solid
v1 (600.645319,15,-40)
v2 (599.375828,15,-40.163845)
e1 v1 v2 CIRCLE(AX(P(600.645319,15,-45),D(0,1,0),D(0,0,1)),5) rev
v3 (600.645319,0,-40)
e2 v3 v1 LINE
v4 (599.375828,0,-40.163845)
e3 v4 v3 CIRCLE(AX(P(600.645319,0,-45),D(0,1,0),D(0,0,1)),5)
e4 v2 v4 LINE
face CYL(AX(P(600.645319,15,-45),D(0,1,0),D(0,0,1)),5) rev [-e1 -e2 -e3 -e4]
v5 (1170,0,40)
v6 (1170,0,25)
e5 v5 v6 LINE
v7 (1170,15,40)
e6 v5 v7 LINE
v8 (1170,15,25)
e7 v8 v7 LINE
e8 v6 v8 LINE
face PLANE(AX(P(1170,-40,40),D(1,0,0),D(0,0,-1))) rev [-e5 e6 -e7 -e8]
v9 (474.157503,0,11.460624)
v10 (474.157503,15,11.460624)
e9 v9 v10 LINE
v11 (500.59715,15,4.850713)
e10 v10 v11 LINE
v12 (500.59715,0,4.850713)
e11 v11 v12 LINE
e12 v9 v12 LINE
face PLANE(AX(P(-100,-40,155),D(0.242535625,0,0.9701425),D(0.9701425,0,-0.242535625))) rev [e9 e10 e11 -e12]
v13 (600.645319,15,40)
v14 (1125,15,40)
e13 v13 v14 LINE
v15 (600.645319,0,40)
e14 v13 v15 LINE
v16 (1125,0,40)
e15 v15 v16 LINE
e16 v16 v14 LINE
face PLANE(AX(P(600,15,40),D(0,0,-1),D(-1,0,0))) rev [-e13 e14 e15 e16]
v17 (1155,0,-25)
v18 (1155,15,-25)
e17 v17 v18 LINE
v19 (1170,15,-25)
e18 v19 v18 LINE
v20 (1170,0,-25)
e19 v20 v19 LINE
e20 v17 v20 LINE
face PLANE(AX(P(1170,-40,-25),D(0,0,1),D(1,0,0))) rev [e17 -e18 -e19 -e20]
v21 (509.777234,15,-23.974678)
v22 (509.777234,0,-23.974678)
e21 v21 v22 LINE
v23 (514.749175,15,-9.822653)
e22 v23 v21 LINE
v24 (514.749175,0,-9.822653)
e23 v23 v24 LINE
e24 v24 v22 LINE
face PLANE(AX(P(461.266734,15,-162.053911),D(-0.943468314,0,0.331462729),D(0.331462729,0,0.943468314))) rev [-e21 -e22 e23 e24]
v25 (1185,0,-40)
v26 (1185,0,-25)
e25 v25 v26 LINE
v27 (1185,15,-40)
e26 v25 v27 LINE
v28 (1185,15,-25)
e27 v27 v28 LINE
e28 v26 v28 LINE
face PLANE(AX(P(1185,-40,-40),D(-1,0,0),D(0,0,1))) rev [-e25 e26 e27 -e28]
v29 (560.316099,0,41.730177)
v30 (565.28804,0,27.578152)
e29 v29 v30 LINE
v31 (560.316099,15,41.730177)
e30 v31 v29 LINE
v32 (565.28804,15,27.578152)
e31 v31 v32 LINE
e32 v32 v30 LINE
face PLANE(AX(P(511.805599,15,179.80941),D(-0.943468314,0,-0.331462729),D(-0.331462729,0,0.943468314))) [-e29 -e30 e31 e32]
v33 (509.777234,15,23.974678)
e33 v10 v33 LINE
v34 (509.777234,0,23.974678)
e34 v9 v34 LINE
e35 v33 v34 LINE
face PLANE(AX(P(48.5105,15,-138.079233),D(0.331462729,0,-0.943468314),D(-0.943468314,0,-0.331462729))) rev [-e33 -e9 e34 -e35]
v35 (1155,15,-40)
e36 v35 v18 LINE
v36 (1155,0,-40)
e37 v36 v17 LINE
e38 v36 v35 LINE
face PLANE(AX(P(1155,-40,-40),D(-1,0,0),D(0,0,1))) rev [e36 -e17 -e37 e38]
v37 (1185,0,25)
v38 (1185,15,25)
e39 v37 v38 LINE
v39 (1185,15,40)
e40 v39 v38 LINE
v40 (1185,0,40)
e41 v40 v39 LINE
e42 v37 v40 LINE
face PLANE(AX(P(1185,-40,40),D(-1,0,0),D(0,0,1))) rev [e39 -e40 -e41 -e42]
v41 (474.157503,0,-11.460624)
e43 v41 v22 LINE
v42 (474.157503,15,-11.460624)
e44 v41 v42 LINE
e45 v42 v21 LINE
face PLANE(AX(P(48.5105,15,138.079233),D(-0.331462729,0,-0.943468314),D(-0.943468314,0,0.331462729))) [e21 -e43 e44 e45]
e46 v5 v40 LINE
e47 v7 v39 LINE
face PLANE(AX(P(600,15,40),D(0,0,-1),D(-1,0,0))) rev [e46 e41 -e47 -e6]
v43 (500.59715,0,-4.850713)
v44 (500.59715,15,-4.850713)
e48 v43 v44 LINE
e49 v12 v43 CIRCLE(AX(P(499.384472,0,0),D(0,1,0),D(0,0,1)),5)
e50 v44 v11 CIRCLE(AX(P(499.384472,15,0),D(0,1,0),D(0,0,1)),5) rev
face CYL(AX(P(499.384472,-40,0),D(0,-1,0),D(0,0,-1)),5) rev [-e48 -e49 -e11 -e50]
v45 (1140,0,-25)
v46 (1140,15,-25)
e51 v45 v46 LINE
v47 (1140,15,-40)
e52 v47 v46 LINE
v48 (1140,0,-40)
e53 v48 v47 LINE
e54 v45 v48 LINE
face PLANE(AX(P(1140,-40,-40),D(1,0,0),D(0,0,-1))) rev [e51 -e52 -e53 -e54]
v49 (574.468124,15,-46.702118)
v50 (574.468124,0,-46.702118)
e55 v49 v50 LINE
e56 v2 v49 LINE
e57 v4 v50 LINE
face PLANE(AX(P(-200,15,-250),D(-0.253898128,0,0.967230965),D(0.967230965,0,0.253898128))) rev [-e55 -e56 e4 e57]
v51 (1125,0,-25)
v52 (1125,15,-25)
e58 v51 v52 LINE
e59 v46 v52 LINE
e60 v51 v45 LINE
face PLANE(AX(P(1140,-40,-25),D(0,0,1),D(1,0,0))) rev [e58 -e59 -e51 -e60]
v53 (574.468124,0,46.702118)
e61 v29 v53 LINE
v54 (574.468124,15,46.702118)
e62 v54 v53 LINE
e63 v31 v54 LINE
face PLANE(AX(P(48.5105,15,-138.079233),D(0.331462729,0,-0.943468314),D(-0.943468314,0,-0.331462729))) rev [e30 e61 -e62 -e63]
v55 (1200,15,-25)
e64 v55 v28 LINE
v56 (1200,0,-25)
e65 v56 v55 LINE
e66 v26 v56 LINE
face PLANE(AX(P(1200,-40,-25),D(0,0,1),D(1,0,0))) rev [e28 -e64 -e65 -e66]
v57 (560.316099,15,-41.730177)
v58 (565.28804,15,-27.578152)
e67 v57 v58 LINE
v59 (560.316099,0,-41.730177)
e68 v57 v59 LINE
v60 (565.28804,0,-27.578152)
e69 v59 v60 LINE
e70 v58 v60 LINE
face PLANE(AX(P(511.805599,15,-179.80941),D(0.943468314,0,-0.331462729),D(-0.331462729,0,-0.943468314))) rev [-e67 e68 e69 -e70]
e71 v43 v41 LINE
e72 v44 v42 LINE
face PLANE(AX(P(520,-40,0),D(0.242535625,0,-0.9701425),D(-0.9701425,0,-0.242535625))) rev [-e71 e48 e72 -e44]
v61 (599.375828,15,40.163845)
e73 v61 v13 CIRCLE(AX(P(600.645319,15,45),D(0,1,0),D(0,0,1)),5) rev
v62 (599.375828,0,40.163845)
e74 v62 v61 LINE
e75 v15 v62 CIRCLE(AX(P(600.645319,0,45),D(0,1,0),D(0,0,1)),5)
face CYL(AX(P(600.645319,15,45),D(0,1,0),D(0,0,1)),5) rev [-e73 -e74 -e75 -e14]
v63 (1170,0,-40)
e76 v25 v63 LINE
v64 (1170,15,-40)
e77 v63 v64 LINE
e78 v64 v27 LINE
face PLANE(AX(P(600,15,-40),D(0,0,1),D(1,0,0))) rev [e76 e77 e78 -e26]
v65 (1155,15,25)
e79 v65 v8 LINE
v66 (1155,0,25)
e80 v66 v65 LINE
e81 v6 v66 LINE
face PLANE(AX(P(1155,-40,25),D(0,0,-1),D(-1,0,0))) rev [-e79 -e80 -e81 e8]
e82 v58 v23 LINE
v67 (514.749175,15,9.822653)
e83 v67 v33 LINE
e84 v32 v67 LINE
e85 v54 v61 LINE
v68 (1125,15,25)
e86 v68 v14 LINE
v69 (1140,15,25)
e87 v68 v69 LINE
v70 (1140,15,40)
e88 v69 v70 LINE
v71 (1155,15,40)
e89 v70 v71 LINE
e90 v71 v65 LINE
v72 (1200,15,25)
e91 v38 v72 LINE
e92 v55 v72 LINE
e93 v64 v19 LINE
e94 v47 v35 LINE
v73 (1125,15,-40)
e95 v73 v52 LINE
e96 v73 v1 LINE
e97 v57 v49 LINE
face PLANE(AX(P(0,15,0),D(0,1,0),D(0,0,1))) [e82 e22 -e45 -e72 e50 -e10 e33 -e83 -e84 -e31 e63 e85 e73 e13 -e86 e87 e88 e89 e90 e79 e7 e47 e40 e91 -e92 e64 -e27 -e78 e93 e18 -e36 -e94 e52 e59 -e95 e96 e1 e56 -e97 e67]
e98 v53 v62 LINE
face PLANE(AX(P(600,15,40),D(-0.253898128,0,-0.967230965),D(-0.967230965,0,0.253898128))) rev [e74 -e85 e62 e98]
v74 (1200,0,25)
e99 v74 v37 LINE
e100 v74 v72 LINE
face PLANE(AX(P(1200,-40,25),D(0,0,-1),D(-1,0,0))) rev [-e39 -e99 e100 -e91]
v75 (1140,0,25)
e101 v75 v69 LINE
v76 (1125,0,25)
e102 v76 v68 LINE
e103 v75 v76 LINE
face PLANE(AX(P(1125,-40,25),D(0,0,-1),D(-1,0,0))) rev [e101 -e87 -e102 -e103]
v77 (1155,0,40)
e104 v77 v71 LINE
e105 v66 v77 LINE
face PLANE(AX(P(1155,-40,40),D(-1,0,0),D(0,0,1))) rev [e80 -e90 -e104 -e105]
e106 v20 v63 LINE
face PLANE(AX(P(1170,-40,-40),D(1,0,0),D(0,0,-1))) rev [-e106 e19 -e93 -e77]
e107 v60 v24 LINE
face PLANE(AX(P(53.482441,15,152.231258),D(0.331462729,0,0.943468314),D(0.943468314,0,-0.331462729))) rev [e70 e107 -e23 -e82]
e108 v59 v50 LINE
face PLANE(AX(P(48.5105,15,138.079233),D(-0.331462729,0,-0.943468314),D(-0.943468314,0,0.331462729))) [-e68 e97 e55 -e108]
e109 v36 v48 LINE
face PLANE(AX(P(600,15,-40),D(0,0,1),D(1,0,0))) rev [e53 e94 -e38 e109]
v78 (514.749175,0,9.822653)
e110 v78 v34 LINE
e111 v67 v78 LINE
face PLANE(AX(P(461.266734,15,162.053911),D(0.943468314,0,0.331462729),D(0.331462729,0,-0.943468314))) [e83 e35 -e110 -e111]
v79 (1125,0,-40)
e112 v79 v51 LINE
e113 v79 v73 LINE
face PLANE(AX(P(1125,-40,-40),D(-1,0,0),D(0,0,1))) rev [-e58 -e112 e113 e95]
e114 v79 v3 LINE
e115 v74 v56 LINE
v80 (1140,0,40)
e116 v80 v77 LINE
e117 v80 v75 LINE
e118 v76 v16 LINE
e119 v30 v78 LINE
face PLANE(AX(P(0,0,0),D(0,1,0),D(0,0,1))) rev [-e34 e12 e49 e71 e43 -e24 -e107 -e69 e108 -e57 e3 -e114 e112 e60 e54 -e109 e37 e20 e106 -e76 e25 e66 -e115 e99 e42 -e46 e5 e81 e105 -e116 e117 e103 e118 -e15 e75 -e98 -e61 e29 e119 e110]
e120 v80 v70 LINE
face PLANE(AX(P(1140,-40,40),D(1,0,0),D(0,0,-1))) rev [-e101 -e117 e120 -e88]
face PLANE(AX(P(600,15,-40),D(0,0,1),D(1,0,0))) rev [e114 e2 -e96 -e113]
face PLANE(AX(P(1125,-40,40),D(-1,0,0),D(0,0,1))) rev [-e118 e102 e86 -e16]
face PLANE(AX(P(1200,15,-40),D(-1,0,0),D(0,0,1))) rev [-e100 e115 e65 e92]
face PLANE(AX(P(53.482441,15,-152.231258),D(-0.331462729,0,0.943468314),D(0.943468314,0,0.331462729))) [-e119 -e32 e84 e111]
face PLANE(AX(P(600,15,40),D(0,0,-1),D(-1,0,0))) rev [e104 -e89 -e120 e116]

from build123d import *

# Parameters (mm, degrees)
BOSS_EXTRUDE1_DEPTH             = 15
BOSS_EXTRUDE2_REACH             = 1239.023
BOSS_EXTRUDE2_DIRECTION_2_REACH = 1239.023
CUT_EXTRUDE2_DEPTH              = 1238.578280352
CUT_EXTRUDE2_DEPTH_BACK         = 1238.578280352
SKETCH5_W                       = 40
SKETCH5_H                       = 40
CUT_EXTRUDE3_DEPTH              = 1238.578280352
BOSS_EXTRUDE4_DEPTH             = 75
CUT_EXTRUDE4_DEPTH              = 1241.107934819
CUT_EXTRUDE4_DEPTH_BACK         = 1241.107934819
SKETCH8_W                       = 15
SKETCH8_H                       = 73.7
FILLET1_R                       = 5
CUT_EXTRUDE5_DEPTH              = 1241.107934819
CUT_EXTRUDE5_DEPTH_BACK         = 1241.107934819
SKETCH9_W                       = 25
SKETCH9_H                       = 15
SKETCH9_W_2                     = 15
CUT_EXTRUDE6_DEPTH              = 1241.107934819
CUT_EXTRUDE6_DEPTH_BACK         = 1241.107934819
SKETCH10_W                      = 1728.920732784
SKETCH10_H                      = 178.853868908
SKETCH10_W_2                    = 1650
SKETCH10_H_2                    = 15
CUT_EXTRUDE8_DEPTH              = 1238.022635201


with BuildPart() as part:
    # Sketch1 → Boss-Extrude1 (new body)
    with BuildSketch(Plane(origin=(0, 0, 0), x_dir=(1, 0, 0), z_dir=(0, 1, 0))):
        Polygon((-450, 300), (-400, 300), (-200, 250), (600, 40), (1200, 40), (1200, -40), (600, -40), (-200, -250), (-400, -300), (-450, -300), align=None)
    extrude(amount=BOSS_EXTRUDE1_DEPTH)

    # Boss-Extrude2: up to this face of the body (flat: up to its plane)
    boss_extrude2_end = Plane(part.part.faces().sort_by_distance((-425, 7.5, 300))[0])
    # Sketch2 → Boss-Extrude2 (add, up to the picked face)
    with BuildSketch(Plane.XY, mode=Mode.PRIVATE) as boss_extrude2_sk1:
        with BuildLine():
            Line((-425, 0), (-450, 0))
            Line((-450, 0), (-450, -40))
            Line((-450, -40), (-440, -40))
            Line((-440, -40), (-440, -15))
            ThreePointArc((-440, -15), (-435.606601718, -4.393398282), (-425, 0))
        make_face()
    boss_extrude2_tool1 = split(extrude(boss_extrude2_sk1.sketch, amount=BOSS_EXTRUDE2_REACH, mode=Mode.PRIVATE), bisect_by=boss_extrude2_end, keep=Keep.BOTH, mode=Mode.PRIVATE)
    # Sketch2 → Boss-Extrude2 (add, up to the picked face)
    with BuildSketch(Plane.XY, mode=Mode.PRIVATE) as boss_extrude2_sk2:
        with BuildLine():
            Line((-400, 0), (-425, 0))
            ThreePointArc((-425, 0), (-414.393398282, -4.393398282), (-410, -15))
            Line((-410, -15), (-410, -40))
            Line((-410, -40), (-400, -40))
            Line((-400, -40), (-400, 0))
        make_face()
    boss_extrude2_tool2 = split(extrude(boss_extrude2_sk2.sketch, amount=BOSS_EXTRUDE2_REACH, mode=Mode.PRIVATE), bisect_by=boss_extrude2_end, keep=Keep.BOTH, mode=Mode.PRIVATE)
    add(boss_extrude2_tool1.solids().sort_by(Axis((-444.100555, -18.206662, 0), (0, 0, 1)))[0])
    add(boss_extrude2_tool2.solids().sort_by(Axis((-405.899445, -18.206662, 0), (0, 0, 1)))[0])

    # Boss-Extrude2 direction 2: up to this face of the body (flat: up to its plane)
    boss_extrude2_direction_2_end = Plane(part.part.faces().sort_by_distance((-425, 7.5, -300))[0])
    # Sketch2 → Boss-Extrude2 direction 2 (add, up to the picked face)
    with BuildSketch(Plane.XY, mode=Mode.PRIVATE) as boss_extrude2_direction_2_sk1:
        with BuildLine():
            Line((-425, 0), (-450, 0))
            Line((-450, 0), (-450, -40))
            Line((-450, -40), (-440, -40))
            Line((-440, -40), (-440, -15))
            ThreePointArc((-440, -15), (-435.606601718, -4.393398282), (-425, 0))
        make_face()
    boss_extrude2_direction_2_tool1 = split(extrude(boss_extrude2_direction_2_sk1.sketch, amount=-BOSS_EXTRUDE2_DIRECTION_2_REACH, mode=Mode.PRIVATE), bisect_by=boss_extrude2_direction_2_end, keep=Keep.BOTH, mode=Mode.PRIVATE)
    # Sketch2 → Boss-Extrude2 direction 2 (add, up to the picked face)
    with BuildSketch(Plane.XY, mode=Mode.PRIVATE) as boss_extrude2_direction_2_sk2:
        with BuildLine():
            Line((-400, 0), (-425, 0))
            ThreePointArc((-425, 0), (-414.393398282, -4.393398282), (-410, -15))
            Line((-410, -15), (-410, -40))
            Line((-410, -40), (-400, -40))
            Line((-400, -40), (-400, 0))
        make_face()
    boss_extrude2_direction_2_tool2 = split(extrude(boss_extrude2_direction_2_sk2.sketch, amount=-BOSS_EXTRUDE2_DIRECTION_2_REACH, mode=Mode.PRIVATE), bisect_by=boss_extrude2_direction_2_end, keep=Keep.BOTH, mode=Mode.PRIVATE)
    add(boss_extrude2_direction_2_tool1.solids().sort_by(Axis((-444.100555, -18.206662, 0), (0, 0, -1)))[0])
    add(boss_extrude2_direction_2_tool2.solids().sort_by(Axis((-405.899445, -18.206662, 0), (0, 0, -1)))[0])

    # Sketch4 → Cut-Extrude2 (cut, two sides: drawn at the far end of the back side and taken through both)
    with BuildSketch(Plane(origin=(0, 0, 0), x_dir=(1, 0, 0), z_dir=(0, 1, 0)).offset(-CUT_EXTRUDE2_DEPTH_BACK)):
        Polygon((-450, 230), (-400, 230), (-150, 167.5), (-150, -167.5), (-400, -230), (-450, -230), align=None)
        Polygon((-100, 155), (-100, -155), (520, 0), align=None)
    extrude(amount=CUT_EXTRUDE2_DEPTH + CUT_EXTRUDE2_DEPTH_BACK, mode=Mode.SUBTRACT)

    # Sketch5 → Cut-Extrude3 (cut, through all)
    with BuildSketch(Plane(origin=(0, 0, 0), x_dir=(0, 0, -1), z_dir=(1, 0, 0))):
        with Locations((-265, -20)):
            Rectangle(SKETCH5_W, SKETCH5_H)
        with Locations((265, -20)):
            Rectangle(SKETCH5_W, SKETCH5_H)
    extrude(amount=-CUT_EXTRUDE3_DEPTH, mode=Mode.SUBTRACT)

    # Sketch7 → Boss-Extrude4 (add)
    with BuildSketch(Plane(origin=(1200, 0, 0), x_dir=(0, 0, -1), z_dir=(1, 0, 0))):
        with BuildLine():
            Line((-87.5, 50), (-40, 15))
            Line((-40, 15), (40, 15))
            Line((40, 15), (87.5, 50))
            Line((87.5, 50), (87.5, 88.7))
            Line((87.5, 88.7), (58.5, 88.7))
            Line((58.5, 88.7), (58.5, 63.2))
            Line((58.5, 63.2), (48.5, 63.2))
            Line((48.5, 63.2), (48.5, 88.7))
            Line((48.5, 88.7), (20, 88.7))
            Line((20, 88.7), (20, 50))
            ThreePointArc((20, 50), (0, 30), (-20, 50))
            Line((-20, 50), (-20, 88.7))
            Line((-20, 88.7), (-63, 88.7))
            Line((-63, 88.7), (-63, 63.2))
            Line((-63, 63.2), (-73, 63.2))
            Line((-73, 63.2), (-73, 88.7))
            Line((-73, 88.7), (-87.5, 88.7))
            Line((-87.5, 88.7), (-87.5, 50))
        make_face()
    extrude(amount=-BOSS_EXTRUDE4_DEPTH)

    # Sketch8 → Cut-Extrude4 (cut, two sides: drawn at the far end of the back side and taken through both)
    with BuildSketch(Plane.XY.offset(-CUT_EXTRUDE4_DEPTH_BACK)):
        with Locations((1147.5, 51.85)):
            Rectangle(SKETCH8_W, SKETCH8_H)
        with Locations((1177.5, 51.85)):
            Rectangle(SKETCH8_W, SKETCH8_H)
    extrude(amount=CUT_EXTRUDE4_DEPTH + CUT_EXTRUDE4_DEPTH_BACK, mode=Mode.SUBTRACT)

    # Fillet1
    fillet1_edges = [part.edges().sort_by_distance(p)[0] for p in [
        (1192.5, 50, 87.5),
        (1162.5, 50, 87.5),
        (1132.5, 50, 87.5),
        (1192.5, 50, -87.5),
        (1162.5, 50, -87.5),
        (1132.5, 50, -87.5),
        (1192.5, 88.7, -87.5),
        (1162.5, 88.7, -87.5),
        (1132.5, 88.7, -87.5),
        (1132.5, 88.7, -58.5),
        (1162.5, 88.7, -58.5),
        (1192.5, 88.7, -58.5),
        (1192.5, 88.7, -48.5),
        (1162.5, 88.7, -48.5),
        (1132.5, 88.7, -48.5),
        (1192.5, 88.7, -20),
        (1162.5, 88.7, -20),
        (1132.5, 88.7, -20),
        (1192.5, 88.7, 63),
        (1162.5, 88.7, 63),
        (1132.5, 88.7, 63),
        (1132.5, 88.7, 87.5),
        (1162.5, 88.7, 87.5),
        (1192.5, 88.7, 87.5),
        (1192.5, 88.7, 73),
        (1162.5, 88.7, 73),
        (1132.5, 88.7, 73),
        (1192.5, 88.7, 20),
        (1162.5, 88.7, 20),
        (1132.5, 88.7, 20),
        (600, 7.5, 40),
        (600, 7.5, -40),
        (520, 7.5, 0),
        (-440, -40, -292.5),
        (-440, -40, -237.5),
        (-400, -40, -292.5),
        (-400, -40, -237.5),
        (-450, -40, -237.5),
        (-410, -40, -237.5),
        (-450, -40, -292.5),
        (-410, -40, -292.5),
        (-150, 7.5, 167.5),
        (-100, 7.5, 155),
        (-150, 7.5, -167.5),
        (-100, 7.5, -155),
        (-450, -40, 237.5),
        (-410, -40, 237.5),
        (-440, -40, 237.5),
        (-400, -40, 237.5),
        (-450, -40, 292.5),
        (-440, -40, 292.5),
        (-400, -40, 292.5),
        (-410, -40, 292.5),
    ]]
    fillet(fillet1_edges, radius=FILLET1_R - 0.0001)  # a hair under: the kernel refuses the full size

    # Sketch9 → Cut-Extrude5 (cut, two sides: drawn at the far end of the back side and taken through both)
    with BuildSketch(Plane(origin=(0, 0, 0), x_dir=(1, 0, 0), z_dir=(0, 1, 0)).offset(-CUT_EXTRUDE5_DEPTH_BACK)):
        with Locations((-425, -292.5)):
            Rectangle(SKETCH9_W, SKETCH9_H)
        with Locations((1192.5, -32.5)):
            Rectangle(SKETCH9_W_2, SKETCH9_H)
        with Locations((1192.5, 32.5)):
            Rectangle(SKETCH9_W_2, SKETCH9_H)
        with Locations((1162.5, 32.5)):
            Rectangle(SKETCH9_W_2, SKETCH9_H)
        with Locations((1132.5, 32.5)):
            Rectangle(SKETCH9_W_2, SKETCH9_H)
        with Locations((1132.5, -32.5)):
            Rectangle(SKETCH9_W_2, SKETCH9_H)
        with Locations((1162.5, -32.5)):
            Rectangle(SKETCH9_W_2, SKETCH9_H)
        with Locations((-425, -237.5)):
            Rectangle(SKETCH9_W, SKETCH9_H)
        with Locations((-425, 237.5)):
            Rectangle(SKETCH9_W, SKETCH9_H)
        with Locations((-425, 292.5)):
            Rectangle(SKETCH9_W, SKETCH9_H)
    extrude(amount=CUT_EXTRUDE5_DEPTH + CUT_EXTRUDE5_DEPTH_BACK, mode=Mode.SUBTRACT)


with BuildPart() as cut_extrude5_piece_1:
    # of the separate pieces the step leaves, piece 1, a body of its own (cut_extrude5_pieces)
    add(part.part.solids().sort_by_distance((-400, -35.0001, -300))[0])


with BuildPart() as cut_extrude5_piece_2:
    # of the separate pieces the step leaves, piece 2, a body of its own (cut_extrude5_pieces)
    add(part.part.solids().sort_by_distance((1170, 48.501289589, 85.46603587))[0])


with BuildPart() as cut_extrude5_piece_3:
    # of the separate pieces the step leaves, piece 3, a body of its own (cut_extrude5_pieces)
    add(part.part.solids().sort_by_distance((1170, 48.501289589, -85.46603587))[0])


with BuildPart() as cut_extrude5_piece_4:
    # of the separate pieces the step leaves, piece 4, a body of its own (cut_extrude5_pieces)
    add(part.part.solids().sort_by_distance((1125, 83.7001, 73))[0])


with BuildPart() as cut_extrude5_piece_5:
    # of the separate pieces the step leaves, piece 5, a body of its own (cut_extrude5_pieces)
    add(part.part.solids().sort_by_distance((1200, 48.501289589, 85.46603587))[0])


with BuildPart() as cut_extrude5_piece_6:
    # of the separate pieces the step leaves, piece 6, a body of its own (cut_extrude5_pieces)
    add(part.part.solids().sort_by_distance((1200, 48.501289589, -85.46603587))[0])


with BuildPart() as cut_extrude5_piece_7:
    # of the separate pieces the step leaves, piece 7, a body of its own (cut_extrude5_pieces)
    add(part.part.solids().sort_by_distance((1125, 88.7, -40))[0])


with BuildPart() as cut_extrude6_tool:
    # Sketch10 → Cut-Extrude6 (new, two sides: drawn at the far end of the back side and taken through both)
    with BuildSketch(Plane.XY.offset(-CUT_EXTRUDE6_DEPTH_BACK)):
        with Locations((378.379601058, 20.599691165)):
            Rectangle(SKETCH10_W, SKETCH10_H)
        with Locations((375, 7.5)):
            Rectangle(SKETCH10_W_2, SKETCH10_H_2, mode=Mode.SUBTRACT)
    extrude(amount=CUT_EXTRUDE6_DEPTH + CUT_EXTRUDE6_DEPTH_BACK)


with BuildPart() as cut_extrude5_piece_1_1:
    add(cut_extrude5_piece_1.part)

    # Cut-Extrude6: cut by cut_extrude6_tool
    add(cut_extrude6_tool.part, mode=Mode.SUBTRACT)

    # Sketch12 → Cut-Extrude8 (cut, through all)
    with BuildSketch(Plane(origin=(0, 0, 0), x_dir=(1, 0, 0), z_dir=(0, 1, 0))):
        Polygon((474.15750273, -11.460624318), (441.536230577, 0), (474.15750273, 11.460624318), (509.777233765, 23.974678146), (560.316098949, 41.730176601), (574.468123656, 46.70211754), (600.645318554, 55.898785132), (600.645318554, 300), (-450, 300), (-450, -300), (600.645318554, -300), (600.645318554, -55.898785132), (574.468123656, -46.70211754), (560.316098949, -41.730176601), (509.777233765, -23.974678146), align=None)
        Polygon((514.749174704, -9.82265344), (509.777233765, -23.974678146), (560.316098949, -41.730176601), (565.288039888, -27.578151895), align=None)
        Polygon((560.316098949, 41.730176601), (509.777233765, 23.974678146), (514.749174704, 9.82265344), (565.288039888, 27.578151895), align=None)
    extrude(amount=CUT_EXTRUDE8_DEPTH, mode=Mode.SUBTRACT)


with BuildPart() as cut_extrude5_piece_2_1:
    add(cut_extrude5_piece_2.part)

    # Cut-Extrude6: cut by cut_extrude6_tool
    add(cut_extrude6_tool.part, mode=Mode.SUBTRACT)


with BuildPart() as cut_extrude5_piece_3_1:
    add(cut_extrude5_piece_3.part)

    # Cut-Extrude6: cut by cut_extrude6_tool
    add(cut_extrude6_tool.part, mode=Mode.SUBTRACT)


with BuildPart() as cut_extrude5_piece_4_1:
    add(cut_extrude5_piece_4.part)

    # Cut-Extrude6: cut by cut_extrude6_tool
    add(cut_extrude6_tool.part, mode=Mode.SUBTRACT)


with BuildPart() as cut_extrude5_piece_5_1:
    add(cut_extrude5_piece_5.part)

    # Cut-Extrude6: cut by cut_extrude6_tool
    add(cut_extrude6_tool.part, mode=Mode.SUBTRACT)


with BuildPart() as cut_extrude5_piece_6_1:
    add(cut_extrude5_piece_6.part)

    # Cut-Extrude6: cut by cut_extrude6_tool
    add(cut_extrude6_tool.part, mode=Mode.SUBTRACT)


with BuildPart() as cut_extrude5_piece_7_1:
    add(cut_extrude5_piece_7.part)

    # Cut-Extrude6: cut by cut_extrude6_tool
    add(cut_extrude6_tool.part, mode=Mode.SUBTRACT)


solid = cut_extrude5_piece_1_1.part
